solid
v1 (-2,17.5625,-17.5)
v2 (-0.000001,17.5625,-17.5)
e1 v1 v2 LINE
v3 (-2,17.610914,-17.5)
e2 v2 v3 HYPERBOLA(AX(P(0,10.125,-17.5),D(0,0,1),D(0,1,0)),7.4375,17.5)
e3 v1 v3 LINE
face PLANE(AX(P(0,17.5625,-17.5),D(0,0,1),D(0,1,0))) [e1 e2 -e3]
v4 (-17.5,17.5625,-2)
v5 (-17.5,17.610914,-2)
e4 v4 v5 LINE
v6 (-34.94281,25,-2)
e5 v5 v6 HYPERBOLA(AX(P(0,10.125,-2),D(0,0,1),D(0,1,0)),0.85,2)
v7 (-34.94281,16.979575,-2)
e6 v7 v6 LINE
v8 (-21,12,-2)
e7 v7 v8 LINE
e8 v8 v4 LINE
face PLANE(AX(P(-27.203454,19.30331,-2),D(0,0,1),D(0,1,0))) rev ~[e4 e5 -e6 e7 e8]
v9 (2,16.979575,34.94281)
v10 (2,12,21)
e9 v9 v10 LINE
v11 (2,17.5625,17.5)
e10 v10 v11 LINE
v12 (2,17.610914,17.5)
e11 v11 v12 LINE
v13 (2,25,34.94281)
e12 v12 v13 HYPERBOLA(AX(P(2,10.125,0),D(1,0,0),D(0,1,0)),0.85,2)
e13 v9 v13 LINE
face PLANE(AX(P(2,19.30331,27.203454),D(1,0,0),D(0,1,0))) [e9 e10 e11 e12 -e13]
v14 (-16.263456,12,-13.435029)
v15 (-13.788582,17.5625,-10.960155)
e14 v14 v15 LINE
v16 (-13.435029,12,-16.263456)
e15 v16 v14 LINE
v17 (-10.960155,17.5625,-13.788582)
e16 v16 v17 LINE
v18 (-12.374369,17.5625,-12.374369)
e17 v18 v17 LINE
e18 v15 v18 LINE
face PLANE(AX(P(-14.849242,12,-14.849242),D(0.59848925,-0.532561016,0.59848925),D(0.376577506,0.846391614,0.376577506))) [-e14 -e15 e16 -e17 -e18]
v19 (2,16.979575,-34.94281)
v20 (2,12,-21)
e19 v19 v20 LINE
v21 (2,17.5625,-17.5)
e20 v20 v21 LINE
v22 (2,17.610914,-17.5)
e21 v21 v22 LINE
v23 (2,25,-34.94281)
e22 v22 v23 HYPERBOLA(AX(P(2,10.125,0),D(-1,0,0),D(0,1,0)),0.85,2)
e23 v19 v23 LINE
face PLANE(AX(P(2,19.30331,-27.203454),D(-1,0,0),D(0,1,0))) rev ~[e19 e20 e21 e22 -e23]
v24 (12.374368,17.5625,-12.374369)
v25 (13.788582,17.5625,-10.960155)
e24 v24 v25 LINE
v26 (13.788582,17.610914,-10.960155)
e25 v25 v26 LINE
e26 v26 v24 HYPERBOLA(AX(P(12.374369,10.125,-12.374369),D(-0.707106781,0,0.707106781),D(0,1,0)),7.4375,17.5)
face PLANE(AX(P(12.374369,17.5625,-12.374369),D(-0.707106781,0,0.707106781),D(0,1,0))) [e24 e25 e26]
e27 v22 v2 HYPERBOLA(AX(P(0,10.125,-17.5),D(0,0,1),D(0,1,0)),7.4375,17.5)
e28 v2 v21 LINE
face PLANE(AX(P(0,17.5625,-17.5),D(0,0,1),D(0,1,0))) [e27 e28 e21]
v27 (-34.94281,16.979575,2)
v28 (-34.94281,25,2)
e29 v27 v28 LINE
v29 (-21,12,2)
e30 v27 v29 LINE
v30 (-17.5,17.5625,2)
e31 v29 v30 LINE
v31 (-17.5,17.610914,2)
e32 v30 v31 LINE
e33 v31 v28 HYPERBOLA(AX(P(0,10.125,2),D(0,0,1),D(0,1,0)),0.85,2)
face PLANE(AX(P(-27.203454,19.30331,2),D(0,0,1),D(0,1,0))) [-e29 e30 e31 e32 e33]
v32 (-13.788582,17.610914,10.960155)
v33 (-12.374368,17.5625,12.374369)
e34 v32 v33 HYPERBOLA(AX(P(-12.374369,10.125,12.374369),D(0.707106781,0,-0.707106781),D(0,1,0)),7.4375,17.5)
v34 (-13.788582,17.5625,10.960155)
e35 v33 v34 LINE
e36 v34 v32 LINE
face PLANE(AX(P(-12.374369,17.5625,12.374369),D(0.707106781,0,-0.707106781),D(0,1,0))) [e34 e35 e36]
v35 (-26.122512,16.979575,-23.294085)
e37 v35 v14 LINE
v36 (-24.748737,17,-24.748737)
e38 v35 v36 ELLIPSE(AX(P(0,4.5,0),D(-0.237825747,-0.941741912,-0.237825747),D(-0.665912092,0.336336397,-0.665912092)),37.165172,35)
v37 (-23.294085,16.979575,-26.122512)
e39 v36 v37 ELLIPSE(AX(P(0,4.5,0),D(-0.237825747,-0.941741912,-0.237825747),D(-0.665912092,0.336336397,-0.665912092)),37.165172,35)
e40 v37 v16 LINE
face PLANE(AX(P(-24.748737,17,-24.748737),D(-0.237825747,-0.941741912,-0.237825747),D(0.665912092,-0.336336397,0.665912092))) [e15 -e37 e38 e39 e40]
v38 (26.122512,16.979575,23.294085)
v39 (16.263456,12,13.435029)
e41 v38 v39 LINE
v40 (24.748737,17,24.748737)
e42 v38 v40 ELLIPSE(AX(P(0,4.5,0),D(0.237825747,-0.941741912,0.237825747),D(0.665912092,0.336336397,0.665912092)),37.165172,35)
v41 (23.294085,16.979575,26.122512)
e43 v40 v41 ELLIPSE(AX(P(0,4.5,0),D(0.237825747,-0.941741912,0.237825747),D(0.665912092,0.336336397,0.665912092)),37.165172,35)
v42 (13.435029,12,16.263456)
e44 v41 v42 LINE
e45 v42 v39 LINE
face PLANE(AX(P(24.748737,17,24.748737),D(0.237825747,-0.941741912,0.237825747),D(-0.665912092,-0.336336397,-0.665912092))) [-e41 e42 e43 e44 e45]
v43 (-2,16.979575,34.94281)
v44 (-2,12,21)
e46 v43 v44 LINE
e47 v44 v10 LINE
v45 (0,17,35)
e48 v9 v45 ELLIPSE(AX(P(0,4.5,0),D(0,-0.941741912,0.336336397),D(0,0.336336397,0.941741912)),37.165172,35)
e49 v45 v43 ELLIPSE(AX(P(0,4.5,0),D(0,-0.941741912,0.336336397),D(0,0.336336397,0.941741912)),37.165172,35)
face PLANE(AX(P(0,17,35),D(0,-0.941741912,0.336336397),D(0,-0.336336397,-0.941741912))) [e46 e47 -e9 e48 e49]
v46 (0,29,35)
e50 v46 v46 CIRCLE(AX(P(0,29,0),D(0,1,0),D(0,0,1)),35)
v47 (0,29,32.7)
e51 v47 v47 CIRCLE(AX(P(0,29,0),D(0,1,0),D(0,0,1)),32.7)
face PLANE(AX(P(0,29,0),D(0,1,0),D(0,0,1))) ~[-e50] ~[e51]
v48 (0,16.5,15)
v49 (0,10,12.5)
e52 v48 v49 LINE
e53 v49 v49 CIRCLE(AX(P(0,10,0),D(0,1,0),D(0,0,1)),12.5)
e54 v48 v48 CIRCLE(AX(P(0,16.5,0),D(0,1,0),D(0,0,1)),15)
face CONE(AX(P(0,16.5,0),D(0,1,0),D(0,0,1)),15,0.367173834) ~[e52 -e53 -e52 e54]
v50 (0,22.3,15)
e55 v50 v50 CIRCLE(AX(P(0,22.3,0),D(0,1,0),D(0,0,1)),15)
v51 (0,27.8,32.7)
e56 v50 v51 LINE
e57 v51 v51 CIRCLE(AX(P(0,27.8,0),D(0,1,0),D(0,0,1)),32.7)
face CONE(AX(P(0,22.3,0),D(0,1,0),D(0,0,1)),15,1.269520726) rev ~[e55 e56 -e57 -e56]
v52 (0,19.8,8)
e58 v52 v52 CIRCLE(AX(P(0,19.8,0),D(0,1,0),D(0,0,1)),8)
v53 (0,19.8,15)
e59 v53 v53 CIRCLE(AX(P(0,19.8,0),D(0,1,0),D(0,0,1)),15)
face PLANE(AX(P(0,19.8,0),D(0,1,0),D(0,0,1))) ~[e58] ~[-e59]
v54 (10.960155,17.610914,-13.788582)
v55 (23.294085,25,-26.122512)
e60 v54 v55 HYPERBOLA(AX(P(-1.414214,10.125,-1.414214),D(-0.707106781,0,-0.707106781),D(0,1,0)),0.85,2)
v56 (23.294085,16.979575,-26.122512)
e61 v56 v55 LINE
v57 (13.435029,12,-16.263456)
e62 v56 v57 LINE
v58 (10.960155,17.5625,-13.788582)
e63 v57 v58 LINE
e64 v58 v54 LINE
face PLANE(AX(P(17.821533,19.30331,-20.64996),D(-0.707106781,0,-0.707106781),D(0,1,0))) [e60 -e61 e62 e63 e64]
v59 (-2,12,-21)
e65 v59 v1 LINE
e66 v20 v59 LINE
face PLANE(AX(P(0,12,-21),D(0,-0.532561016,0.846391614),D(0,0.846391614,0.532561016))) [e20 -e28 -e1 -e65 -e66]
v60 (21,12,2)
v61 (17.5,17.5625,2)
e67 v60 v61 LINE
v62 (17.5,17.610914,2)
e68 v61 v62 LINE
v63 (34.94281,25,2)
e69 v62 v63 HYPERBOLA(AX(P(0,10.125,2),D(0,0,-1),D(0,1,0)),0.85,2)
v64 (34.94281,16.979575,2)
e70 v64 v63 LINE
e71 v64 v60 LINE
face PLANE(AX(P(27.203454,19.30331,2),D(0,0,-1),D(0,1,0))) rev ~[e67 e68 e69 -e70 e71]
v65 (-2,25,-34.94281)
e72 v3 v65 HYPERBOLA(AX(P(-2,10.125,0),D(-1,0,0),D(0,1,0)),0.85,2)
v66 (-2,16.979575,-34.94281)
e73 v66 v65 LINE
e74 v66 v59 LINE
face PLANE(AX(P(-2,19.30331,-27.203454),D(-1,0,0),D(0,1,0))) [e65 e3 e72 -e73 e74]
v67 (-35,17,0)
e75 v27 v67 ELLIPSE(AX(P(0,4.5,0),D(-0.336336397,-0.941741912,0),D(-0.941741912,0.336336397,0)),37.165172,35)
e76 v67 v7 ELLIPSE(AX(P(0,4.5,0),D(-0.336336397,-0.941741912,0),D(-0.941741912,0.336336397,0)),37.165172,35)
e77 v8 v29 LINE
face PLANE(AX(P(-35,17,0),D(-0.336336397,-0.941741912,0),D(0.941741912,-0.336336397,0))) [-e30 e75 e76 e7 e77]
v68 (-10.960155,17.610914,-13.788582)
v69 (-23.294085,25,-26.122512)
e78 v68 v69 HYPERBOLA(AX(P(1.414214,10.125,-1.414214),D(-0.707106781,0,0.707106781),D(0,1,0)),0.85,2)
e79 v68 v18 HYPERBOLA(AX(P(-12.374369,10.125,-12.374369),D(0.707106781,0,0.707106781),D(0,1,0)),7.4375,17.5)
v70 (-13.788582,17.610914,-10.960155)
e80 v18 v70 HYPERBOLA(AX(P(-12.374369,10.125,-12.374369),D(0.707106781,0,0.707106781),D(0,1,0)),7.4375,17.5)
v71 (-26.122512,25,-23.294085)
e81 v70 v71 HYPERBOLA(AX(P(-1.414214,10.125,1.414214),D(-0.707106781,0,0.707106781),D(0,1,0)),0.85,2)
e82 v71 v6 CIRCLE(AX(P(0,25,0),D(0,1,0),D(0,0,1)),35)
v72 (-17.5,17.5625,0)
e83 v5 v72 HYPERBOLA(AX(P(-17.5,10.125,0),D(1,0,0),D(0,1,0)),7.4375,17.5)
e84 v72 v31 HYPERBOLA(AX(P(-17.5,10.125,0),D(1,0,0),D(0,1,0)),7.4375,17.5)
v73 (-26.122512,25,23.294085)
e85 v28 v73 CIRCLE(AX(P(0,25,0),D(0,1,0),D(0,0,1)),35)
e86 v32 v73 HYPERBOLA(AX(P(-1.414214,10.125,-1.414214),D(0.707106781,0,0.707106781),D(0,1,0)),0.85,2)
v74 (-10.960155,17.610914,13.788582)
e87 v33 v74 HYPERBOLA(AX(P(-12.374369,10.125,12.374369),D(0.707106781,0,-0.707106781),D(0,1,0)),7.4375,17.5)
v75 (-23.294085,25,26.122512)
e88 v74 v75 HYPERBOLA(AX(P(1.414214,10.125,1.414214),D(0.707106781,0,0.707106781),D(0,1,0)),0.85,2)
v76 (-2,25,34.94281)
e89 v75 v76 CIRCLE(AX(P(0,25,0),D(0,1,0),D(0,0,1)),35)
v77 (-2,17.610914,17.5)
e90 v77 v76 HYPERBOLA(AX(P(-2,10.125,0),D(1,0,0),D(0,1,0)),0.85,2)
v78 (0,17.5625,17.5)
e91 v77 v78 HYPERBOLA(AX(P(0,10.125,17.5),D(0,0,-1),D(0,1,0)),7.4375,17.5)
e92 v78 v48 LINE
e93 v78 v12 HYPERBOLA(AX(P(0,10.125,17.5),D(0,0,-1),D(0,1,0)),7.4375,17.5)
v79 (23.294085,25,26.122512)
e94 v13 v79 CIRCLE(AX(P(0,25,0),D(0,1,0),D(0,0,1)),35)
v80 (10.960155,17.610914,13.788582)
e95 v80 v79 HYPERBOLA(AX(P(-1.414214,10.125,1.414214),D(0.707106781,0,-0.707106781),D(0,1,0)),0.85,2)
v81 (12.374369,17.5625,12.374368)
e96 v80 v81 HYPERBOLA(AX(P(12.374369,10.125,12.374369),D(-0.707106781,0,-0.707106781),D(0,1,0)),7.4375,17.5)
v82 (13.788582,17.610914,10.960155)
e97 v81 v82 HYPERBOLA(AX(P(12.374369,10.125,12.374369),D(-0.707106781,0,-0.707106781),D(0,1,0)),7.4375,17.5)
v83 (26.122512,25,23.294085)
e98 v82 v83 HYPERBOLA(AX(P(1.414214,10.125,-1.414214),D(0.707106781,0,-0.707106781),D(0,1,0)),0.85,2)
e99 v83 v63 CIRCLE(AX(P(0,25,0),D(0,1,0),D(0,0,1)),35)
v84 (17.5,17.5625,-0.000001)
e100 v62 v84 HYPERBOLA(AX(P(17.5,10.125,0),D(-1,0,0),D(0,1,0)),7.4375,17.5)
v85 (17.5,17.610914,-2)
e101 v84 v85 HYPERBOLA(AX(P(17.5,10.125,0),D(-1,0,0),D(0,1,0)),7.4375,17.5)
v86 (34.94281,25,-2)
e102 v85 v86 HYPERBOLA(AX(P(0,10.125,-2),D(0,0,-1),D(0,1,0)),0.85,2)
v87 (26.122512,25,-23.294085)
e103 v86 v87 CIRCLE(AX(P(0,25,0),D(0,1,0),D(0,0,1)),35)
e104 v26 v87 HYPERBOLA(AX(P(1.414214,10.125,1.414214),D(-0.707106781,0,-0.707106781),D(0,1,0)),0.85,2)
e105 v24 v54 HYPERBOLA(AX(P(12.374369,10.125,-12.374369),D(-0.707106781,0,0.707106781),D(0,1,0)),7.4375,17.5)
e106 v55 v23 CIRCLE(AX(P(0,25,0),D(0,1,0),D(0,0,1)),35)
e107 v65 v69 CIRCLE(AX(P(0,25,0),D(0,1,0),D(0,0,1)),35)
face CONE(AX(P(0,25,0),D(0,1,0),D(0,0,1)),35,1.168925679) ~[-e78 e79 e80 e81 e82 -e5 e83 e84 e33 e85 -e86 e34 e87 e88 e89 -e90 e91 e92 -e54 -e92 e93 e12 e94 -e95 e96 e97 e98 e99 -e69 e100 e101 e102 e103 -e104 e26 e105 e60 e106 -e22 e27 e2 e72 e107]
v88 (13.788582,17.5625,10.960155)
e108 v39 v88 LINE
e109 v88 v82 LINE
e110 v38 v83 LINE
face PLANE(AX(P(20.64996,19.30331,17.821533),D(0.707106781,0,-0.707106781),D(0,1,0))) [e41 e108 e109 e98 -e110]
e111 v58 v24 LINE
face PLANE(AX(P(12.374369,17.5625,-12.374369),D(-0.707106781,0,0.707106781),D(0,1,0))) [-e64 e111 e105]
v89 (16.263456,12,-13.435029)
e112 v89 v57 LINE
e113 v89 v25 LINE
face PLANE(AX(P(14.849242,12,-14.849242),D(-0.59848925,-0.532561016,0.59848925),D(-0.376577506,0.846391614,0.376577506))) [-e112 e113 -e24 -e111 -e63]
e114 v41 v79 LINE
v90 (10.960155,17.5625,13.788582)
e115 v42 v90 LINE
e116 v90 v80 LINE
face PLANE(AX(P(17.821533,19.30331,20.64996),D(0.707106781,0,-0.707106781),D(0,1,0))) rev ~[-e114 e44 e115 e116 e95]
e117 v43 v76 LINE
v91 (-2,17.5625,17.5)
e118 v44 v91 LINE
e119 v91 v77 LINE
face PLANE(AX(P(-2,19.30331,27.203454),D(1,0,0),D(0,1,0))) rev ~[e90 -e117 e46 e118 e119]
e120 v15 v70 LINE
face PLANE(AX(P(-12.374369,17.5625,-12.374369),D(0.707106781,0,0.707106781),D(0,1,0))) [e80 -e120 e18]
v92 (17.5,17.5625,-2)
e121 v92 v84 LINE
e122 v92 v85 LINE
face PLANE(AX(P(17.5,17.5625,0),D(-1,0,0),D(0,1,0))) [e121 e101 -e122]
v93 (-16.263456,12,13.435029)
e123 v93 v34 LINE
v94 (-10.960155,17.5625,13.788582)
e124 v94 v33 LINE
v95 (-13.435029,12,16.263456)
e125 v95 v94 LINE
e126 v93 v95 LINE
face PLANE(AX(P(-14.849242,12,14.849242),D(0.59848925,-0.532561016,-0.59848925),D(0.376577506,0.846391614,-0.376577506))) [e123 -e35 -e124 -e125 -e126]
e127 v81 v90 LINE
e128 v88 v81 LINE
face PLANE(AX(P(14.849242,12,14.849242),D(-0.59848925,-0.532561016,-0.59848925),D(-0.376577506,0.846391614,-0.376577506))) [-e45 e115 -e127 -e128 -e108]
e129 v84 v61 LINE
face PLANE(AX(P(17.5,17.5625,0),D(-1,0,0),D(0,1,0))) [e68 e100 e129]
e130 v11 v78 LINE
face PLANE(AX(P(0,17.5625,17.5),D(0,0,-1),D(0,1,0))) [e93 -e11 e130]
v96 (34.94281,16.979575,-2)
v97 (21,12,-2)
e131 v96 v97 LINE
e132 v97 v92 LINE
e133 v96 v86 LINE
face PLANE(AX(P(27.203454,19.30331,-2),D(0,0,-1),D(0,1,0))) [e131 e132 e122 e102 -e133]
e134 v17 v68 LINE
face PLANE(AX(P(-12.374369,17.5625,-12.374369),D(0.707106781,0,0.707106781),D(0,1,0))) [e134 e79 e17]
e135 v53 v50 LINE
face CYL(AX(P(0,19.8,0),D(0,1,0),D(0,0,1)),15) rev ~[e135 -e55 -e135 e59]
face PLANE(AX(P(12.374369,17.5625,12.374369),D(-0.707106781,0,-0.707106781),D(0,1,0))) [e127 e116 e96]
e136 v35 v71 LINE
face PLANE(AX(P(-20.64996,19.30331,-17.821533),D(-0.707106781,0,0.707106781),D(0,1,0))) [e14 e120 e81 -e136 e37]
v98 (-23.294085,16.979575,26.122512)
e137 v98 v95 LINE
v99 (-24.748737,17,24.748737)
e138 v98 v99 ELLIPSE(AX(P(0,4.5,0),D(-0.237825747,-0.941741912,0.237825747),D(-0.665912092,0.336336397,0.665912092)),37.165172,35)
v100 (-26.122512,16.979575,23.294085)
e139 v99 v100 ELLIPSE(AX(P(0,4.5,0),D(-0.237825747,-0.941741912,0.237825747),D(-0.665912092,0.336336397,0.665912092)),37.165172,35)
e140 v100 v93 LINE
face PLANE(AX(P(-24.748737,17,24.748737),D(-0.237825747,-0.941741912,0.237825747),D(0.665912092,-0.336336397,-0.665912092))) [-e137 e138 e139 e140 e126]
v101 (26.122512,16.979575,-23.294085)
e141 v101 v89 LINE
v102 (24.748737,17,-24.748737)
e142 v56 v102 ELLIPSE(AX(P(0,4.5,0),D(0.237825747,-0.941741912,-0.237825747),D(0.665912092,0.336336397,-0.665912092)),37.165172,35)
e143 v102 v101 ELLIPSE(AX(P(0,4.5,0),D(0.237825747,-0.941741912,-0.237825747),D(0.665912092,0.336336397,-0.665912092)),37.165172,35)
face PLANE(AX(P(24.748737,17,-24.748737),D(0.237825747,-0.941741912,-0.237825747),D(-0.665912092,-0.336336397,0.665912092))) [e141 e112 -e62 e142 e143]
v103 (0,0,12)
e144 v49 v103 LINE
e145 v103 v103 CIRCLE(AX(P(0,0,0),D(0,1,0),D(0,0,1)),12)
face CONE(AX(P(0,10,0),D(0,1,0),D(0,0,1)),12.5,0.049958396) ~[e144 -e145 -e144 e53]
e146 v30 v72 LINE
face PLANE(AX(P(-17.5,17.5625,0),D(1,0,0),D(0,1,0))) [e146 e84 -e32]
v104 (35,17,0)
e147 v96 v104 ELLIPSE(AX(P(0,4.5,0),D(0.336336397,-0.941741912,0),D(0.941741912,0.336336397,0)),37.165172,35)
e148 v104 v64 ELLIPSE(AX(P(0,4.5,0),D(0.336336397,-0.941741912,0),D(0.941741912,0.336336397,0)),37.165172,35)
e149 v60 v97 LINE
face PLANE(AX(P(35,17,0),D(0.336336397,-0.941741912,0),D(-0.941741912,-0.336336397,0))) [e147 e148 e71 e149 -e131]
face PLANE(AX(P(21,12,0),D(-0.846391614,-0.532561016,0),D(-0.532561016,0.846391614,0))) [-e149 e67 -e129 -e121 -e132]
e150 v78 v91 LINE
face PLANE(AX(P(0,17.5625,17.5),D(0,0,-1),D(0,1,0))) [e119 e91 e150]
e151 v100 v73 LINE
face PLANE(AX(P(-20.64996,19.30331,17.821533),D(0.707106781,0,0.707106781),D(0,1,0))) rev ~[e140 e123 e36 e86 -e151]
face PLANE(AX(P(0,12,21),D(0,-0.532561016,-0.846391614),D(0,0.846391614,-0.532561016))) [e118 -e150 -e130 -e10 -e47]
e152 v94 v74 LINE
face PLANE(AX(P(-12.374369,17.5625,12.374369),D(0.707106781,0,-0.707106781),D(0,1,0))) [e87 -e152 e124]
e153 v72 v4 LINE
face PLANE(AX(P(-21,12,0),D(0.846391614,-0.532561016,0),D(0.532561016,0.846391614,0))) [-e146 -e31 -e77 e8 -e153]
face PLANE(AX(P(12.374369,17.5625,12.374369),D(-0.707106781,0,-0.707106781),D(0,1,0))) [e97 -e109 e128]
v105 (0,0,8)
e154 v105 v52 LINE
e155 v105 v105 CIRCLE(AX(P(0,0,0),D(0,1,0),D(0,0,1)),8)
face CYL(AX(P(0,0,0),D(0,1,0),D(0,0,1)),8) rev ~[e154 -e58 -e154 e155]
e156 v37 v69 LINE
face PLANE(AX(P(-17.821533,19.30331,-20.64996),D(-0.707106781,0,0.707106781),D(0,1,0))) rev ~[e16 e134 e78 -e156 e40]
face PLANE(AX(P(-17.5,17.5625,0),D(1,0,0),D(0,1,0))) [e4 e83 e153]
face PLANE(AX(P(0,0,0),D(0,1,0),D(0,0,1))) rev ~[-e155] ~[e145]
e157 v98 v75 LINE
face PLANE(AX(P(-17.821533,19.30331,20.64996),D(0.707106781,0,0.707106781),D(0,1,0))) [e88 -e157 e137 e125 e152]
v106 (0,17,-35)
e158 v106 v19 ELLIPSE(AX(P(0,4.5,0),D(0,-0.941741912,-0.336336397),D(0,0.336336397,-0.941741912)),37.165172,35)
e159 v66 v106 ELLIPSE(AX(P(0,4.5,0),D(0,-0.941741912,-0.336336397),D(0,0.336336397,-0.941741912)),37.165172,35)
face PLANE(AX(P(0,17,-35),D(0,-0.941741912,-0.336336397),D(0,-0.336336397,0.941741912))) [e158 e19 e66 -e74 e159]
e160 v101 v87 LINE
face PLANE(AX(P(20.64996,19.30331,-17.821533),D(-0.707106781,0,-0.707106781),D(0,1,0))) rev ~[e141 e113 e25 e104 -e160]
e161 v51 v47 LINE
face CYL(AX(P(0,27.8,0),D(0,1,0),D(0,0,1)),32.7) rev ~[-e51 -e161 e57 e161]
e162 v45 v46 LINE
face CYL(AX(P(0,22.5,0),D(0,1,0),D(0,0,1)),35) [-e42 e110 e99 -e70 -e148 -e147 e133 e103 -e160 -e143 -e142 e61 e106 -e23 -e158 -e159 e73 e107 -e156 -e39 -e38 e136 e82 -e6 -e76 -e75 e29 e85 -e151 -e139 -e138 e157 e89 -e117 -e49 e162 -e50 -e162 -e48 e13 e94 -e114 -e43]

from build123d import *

# Parameters (mm, degrees)
F3_DEPTH        = 2
F3_COPIES_COUNT = 8
F4_W            = 13
F4_H            = 2


# Not quite as in the source:
# - a pattern or mirror of a feature is missing from the dataset's text; its kind, count and spacing are read off the source's solid


with BuildPart() as f1:
    # F0 (on Right) → F1 (revolve)
    with BuildSketch(Plane.YZ):
        Polygon((0, 12), (0, 8), (19.8, 8), (19.8, 15), (22.3, 15), (27.8, 32.7), (29, 32.7), (29, 35), (25, 35), (16.5, 15), (10, 12.5), align=None)
    revolve(axis=Axis((0, 14.5, 0), (0, 1, 0)))

    # F2 (on Right) → F3 (join, symmetric)
    with BuildSketch(Plane.YZ):
        Polygon((27, 35), (25, 35), (17, 35), (12, 21), (17.5625, 17.5), (19.5625, 17.5), align=None)
    f3 = extrude(amount=F3_DEPTH, both=True)

    # F3_copies: F3 ×8 about axis
    f3_copies_axis = Axis((0, 0, 0), (0, 1, 0))
    for i in range(1, F3_COPIES_COUNT):
        add(f3.rotate(f3_copies_axis, i * 360 / F3_COPIES_COUNT))

    # F4 (on Right) → F5 (revolve, cut)
    with BuildSketch(Plane.YZ):
        with Locations((22.5, 36)):
            Rectangle(F4_W, F4_H)
    revolve(axis=Axis((0, 14.5, 0), (0, 1, 0)), mode=Mode.SUBTRACT)


solid = f1.part
